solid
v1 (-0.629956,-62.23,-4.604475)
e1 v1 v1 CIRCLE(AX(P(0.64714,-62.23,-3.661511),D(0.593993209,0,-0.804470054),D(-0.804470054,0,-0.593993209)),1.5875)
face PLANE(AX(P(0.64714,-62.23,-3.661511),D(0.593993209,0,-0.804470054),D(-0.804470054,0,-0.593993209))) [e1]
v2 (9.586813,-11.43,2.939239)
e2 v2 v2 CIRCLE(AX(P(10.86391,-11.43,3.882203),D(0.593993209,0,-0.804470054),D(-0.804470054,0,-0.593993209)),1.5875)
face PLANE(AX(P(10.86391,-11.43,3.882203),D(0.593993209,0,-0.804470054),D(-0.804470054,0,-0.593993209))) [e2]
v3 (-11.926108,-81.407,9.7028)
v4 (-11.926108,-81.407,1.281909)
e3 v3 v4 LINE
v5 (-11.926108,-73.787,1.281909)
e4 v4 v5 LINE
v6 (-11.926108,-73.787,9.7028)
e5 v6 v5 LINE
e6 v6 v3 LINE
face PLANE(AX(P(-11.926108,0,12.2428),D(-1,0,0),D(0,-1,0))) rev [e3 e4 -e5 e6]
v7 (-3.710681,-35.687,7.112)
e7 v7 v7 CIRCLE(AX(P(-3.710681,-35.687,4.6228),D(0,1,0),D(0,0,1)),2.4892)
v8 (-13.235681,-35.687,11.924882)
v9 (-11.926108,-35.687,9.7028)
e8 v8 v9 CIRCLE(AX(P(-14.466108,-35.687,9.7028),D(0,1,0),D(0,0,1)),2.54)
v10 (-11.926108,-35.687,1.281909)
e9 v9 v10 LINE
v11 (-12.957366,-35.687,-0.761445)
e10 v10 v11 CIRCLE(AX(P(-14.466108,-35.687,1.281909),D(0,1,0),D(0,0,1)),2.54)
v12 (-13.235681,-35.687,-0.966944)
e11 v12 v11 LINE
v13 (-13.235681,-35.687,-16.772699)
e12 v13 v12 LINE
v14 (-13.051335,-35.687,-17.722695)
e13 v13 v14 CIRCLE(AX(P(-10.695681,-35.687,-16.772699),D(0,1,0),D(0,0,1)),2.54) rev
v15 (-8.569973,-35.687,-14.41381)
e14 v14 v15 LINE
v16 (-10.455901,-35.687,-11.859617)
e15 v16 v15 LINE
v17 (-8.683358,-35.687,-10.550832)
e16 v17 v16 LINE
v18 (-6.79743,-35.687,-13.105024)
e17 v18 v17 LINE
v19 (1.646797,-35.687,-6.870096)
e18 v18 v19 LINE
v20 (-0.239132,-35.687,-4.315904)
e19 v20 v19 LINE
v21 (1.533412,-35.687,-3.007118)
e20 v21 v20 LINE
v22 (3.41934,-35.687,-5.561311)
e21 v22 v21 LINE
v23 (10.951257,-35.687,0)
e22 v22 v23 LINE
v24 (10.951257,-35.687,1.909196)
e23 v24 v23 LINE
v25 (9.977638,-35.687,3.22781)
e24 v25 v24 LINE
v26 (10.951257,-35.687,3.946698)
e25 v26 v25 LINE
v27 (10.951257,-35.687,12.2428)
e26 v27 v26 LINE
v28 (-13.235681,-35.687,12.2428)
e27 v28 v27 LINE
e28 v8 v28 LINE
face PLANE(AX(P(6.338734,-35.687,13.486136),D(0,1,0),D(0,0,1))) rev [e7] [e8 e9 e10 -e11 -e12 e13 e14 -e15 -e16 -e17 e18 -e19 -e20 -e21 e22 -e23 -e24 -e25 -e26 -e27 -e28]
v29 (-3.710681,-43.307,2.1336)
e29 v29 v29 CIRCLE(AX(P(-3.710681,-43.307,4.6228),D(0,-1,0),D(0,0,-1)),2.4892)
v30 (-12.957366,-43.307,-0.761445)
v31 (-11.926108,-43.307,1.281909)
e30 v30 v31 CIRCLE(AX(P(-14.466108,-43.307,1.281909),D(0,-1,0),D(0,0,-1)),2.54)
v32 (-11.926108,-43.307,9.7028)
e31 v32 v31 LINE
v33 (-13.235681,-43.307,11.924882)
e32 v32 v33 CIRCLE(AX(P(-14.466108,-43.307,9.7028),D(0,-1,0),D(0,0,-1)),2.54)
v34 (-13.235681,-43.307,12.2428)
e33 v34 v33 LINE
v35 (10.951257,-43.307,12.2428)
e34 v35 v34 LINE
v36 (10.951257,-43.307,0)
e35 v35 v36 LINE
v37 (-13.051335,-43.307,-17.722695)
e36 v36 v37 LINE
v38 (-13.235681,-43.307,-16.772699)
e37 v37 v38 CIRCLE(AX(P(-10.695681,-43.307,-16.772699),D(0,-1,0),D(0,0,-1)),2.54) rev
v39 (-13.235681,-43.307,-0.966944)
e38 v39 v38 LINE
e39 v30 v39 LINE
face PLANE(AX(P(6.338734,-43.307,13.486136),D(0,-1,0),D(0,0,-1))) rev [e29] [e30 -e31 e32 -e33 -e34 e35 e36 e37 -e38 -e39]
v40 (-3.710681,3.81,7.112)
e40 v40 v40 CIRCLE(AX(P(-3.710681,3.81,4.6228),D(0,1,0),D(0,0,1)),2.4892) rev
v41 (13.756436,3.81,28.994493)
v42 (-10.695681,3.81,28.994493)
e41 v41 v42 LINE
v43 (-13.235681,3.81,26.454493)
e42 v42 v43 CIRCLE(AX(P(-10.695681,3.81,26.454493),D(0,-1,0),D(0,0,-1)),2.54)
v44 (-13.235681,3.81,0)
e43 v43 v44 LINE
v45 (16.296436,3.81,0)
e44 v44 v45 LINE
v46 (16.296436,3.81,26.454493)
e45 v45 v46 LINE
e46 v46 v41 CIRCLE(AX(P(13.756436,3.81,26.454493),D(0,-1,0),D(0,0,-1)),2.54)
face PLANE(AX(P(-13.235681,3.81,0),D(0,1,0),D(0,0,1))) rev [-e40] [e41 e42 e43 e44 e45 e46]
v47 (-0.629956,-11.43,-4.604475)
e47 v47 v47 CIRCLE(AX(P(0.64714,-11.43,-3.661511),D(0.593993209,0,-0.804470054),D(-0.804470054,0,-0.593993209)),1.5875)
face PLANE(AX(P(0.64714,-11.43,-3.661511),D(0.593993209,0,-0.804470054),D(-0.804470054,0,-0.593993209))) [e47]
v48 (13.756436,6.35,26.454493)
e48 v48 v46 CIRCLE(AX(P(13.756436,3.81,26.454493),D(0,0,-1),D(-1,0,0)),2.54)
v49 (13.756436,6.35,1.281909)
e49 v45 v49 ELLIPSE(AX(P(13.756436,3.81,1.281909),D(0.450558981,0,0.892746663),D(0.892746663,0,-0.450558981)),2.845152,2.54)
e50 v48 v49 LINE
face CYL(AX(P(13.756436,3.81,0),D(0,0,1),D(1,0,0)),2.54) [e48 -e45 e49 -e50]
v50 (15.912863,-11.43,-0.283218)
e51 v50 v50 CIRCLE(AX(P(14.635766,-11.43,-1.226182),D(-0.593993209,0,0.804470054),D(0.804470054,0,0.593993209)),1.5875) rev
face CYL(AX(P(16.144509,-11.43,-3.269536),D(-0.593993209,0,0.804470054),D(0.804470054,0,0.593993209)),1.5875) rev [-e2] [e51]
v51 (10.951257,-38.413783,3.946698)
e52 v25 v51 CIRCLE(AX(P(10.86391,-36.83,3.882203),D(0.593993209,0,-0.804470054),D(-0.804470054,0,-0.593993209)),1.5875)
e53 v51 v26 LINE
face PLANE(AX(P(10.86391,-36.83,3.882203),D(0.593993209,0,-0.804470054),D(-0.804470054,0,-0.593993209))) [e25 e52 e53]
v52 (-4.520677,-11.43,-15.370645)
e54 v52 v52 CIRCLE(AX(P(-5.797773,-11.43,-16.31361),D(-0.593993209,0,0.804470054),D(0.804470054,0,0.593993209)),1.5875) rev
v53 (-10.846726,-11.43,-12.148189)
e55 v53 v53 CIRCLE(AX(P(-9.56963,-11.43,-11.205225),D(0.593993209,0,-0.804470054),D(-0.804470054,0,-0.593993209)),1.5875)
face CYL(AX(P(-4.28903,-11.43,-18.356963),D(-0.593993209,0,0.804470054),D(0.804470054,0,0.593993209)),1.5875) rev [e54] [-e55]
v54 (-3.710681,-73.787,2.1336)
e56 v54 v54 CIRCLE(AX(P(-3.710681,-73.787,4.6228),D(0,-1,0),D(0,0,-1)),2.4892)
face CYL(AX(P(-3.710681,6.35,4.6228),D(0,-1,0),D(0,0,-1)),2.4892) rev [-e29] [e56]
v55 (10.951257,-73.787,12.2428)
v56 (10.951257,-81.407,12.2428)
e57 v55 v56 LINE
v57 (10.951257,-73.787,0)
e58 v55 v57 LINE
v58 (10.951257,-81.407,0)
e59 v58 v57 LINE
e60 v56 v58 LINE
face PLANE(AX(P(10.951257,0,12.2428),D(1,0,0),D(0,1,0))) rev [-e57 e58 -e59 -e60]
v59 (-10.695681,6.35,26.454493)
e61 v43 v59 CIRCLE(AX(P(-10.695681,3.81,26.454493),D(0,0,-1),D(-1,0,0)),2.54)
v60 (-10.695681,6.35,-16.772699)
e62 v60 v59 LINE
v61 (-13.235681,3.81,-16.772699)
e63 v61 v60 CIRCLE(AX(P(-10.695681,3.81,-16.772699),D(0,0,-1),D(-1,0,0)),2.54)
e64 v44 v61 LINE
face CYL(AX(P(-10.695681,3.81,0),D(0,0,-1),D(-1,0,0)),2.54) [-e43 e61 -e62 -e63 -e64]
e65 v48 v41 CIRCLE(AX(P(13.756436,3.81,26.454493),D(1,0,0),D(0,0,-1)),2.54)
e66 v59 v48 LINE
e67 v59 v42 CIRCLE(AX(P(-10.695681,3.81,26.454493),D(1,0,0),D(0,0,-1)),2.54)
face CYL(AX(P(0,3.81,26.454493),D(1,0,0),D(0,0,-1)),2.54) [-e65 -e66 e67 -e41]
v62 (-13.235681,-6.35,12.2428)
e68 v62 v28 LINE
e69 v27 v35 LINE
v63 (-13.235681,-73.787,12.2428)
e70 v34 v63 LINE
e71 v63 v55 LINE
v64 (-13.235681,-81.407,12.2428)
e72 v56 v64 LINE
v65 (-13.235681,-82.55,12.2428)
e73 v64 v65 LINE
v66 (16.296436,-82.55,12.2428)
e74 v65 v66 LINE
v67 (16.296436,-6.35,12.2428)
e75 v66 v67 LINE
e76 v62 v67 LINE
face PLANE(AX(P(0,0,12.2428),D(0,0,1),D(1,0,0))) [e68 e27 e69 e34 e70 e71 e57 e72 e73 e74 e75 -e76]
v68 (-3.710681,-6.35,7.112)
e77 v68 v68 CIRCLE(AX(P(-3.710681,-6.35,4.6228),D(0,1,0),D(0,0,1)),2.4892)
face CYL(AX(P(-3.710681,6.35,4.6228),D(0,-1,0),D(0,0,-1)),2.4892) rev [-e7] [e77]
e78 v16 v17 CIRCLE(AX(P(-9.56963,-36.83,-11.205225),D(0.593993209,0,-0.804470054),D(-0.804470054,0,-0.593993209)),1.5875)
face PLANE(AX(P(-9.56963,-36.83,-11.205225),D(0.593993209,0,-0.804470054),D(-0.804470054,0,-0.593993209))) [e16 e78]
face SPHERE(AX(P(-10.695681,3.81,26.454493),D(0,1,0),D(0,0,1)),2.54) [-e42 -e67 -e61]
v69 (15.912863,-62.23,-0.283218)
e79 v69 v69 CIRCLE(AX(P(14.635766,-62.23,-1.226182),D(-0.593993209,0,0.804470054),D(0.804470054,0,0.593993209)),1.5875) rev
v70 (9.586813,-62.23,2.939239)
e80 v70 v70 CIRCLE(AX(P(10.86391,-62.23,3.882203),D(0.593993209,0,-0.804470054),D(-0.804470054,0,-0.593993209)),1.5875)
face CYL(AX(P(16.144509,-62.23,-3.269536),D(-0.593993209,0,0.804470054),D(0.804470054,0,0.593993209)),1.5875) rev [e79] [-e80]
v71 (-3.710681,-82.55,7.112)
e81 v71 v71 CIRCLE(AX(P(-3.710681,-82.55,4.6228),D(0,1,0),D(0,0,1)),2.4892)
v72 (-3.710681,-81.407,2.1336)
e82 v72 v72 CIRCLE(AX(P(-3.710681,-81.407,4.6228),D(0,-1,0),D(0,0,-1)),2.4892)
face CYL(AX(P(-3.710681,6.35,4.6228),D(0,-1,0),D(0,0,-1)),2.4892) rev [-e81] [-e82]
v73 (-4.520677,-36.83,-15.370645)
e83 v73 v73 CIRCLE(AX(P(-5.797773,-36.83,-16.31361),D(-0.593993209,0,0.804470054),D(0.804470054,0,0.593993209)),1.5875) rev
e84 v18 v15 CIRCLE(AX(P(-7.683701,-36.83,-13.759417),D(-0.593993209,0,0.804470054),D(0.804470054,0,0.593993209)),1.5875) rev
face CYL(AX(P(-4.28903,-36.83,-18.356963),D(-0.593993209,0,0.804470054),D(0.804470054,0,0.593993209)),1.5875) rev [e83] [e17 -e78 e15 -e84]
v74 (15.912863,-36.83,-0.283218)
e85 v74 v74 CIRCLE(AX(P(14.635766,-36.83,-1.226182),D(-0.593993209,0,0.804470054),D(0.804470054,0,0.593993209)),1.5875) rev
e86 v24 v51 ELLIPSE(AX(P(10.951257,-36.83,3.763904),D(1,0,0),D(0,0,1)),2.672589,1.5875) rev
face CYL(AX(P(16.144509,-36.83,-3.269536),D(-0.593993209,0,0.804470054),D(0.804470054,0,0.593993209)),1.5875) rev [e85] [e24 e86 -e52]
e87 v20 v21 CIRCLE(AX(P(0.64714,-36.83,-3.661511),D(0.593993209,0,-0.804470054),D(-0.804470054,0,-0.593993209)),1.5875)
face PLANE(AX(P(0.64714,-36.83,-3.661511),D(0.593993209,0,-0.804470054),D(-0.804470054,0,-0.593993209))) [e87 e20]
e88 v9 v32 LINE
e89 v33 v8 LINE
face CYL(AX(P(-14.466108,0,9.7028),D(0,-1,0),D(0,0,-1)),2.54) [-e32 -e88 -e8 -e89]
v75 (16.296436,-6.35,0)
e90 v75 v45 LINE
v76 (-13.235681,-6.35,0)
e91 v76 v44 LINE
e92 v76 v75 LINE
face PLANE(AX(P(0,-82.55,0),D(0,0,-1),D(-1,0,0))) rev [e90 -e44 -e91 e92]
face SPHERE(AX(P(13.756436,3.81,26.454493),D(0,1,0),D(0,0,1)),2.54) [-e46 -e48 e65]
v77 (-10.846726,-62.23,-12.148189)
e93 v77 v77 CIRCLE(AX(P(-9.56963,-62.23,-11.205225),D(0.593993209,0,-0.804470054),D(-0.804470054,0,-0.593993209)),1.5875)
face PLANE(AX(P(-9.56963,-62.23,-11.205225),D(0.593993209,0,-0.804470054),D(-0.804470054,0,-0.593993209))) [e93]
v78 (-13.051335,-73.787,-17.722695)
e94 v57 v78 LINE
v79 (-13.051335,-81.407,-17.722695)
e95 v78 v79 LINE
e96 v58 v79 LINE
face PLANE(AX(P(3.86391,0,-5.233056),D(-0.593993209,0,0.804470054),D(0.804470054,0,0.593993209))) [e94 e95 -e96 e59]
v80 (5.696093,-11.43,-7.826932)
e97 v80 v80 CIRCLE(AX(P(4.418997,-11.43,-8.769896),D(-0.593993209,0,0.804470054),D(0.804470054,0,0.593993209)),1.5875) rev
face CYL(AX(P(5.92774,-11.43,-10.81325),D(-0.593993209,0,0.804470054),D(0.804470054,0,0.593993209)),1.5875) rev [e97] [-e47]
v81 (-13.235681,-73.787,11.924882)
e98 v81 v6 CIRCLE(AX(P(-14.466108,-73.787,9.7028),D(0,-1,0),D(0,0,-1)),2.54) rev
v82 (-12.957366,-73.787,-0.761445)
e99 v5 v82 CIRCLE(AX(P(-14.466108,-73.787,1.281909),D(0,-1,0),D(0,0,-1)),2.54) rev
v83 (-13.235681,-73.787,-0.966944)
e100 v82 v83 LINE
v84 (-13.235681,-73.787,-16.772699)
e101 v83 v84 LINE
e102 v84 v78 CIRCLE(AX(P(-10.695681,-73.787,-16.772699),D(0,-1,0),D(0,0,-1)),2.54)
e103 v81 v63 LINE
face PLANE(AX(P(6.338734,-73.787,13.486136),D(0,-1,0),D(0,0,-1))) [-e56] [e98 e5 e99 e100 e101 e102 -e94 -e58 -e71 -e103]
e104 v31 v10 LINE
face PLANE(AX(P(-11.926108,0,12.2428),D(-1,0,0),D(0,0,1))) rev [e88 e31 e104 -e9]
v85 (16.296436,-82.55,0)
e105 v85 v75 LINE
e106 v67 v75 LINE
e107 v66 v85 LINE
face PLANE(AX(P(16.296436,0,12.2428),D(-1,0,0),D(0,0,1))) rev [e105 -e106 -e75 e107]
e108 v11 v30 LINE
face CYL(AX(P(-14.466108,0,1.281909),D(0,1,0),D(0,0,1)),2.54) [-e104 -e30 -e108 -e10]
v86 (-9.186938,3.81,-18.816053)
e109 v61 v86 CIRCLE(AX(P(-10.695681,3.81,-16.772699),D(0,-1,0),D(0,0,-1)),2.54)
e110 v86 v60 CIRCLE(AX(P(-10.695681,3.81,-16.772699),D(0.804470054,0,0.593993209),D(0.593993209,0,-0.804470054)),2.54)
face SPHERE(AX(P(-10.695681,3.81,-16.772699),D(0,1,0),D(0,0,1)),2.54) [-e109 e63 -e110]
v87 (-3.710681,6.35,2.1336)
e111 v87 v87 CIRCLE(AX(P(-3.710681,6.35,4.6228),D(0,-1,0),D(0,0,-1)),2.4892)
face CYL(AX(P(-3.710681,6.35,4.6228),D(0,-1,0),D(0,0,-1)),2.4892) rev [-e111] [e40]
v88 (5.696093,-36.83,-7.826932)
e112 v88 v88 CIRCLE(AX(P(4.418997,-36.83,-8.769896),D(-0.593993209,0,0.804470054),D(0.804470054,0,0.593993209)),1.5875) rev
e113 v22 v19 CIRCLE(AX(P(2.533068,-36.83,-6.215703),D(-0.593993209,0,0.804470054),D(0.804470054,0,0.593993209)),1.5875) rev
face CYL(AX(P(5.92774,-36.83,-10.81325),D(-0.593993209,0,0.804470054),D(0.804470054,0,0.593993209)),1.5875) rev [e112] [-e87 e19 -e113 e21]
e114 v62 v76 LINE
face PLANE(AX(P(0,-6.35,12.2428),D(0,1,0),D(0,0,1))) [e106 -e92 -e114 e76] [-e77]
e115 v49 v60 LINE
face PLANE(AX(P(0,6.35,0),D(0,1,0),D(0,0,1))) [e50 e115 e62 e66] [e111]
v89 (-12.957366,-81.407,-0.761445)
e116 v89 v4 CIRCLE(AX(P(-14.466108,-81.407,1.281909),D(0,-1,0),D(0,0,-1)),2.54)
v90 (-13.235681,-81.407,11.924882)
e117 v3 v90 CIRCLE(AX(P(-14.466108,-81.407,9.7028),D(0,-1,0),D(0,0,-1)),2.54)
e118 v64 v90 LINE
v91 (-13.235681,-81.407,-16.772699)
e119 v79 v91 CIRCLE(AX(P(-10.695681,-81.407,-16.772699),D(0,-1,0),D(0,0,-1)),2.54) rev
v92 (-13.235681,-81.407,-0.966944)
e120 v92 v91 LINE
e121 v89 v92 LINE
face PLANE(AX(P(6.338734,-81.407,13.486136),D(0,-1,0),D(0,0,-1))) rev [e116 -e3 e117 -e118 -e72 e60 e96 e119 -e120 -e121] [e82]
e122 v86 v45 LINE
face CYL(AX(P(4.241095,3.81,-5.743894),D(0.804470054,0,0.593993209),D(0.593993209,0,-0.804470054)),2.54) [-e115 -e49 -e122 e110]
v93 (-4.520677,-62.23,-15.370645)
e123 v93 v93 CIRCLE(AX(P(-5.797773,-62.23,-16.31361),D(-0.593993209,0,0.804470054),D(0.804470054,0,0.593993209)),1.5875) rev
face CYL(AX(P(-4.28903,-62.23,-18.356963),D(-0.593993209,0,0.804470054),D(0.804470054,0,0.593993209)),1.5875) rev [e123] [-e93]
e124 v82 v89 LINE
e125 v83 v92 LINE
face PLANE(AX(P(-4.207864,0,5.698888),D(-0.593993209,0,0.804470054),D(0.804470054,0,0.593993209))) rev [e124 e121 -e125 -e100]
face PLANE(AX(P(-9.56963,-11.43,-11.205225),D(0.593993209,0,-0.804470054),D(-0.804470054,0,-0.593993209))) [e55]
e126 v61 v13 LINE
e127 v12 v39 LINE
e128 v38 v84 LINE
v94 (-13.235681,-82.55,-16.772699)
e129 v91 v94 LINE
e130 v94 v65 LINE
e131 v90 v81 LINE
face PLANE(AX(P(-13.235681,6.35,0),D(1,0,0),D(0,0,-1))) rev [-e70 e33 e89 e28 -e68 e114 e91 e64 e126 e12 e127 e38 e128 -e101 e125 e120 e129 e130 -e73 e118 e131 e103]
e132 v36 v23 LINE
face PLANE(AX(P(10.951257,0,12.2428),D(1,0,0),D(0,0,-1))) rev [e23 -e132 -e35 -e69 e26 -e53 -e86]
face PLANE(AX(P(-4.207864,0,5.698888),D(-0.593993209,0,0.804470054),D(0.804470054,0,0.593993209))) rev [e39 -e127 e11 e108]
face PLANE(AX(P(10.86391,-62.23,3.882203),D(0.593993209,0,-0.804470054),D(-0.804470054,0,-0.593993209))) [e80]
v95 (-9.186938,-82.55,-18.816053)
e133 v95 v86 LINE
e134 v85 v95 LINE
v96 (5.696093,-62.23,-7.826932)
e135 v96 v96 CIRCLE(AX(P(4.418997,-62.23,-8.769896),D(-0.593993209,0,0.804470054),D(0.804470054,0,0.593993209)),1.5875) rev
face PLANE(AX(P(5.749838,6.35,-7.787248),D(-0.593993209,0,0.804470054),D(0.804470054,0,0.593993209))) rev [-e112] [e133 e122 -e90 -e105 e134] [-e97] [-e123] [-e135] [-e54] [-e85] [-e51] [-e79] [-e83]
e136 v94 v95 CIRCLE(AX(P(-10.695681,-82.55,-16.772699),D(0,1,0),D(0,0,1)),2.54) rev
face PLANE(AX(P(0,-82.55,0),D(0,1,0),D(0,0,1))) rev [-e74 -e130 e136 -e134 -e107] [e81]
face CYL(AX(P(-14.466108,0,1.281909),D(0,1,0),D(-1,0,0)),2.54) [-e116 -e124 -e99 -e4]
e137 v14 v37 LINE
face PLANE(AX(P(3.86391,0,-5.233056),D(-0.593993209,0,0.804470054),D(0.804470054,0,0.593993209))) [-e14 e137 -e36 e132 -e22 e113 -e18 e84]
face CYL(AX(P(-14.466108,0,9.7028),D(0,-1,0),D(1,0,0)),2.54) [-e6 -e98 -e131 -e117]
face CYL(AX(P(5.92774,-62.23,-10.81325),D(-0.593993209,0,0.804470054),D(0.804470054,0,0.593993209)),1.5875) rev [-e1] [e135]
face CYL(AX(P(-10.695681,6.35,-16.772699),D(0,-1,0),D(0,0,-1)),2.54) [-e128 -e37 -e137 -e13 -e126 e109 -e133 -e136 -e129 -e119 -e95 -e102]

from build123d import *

# Parameters (mm, degrees)
SKETCH1_W               = 29.532117275
SKETCH1_H               = 16.294493356
BOSS_EXTRUDE1_DEPTH     = 6.35
BOSS_EXTRUDE2_DEPTH     = 82.55
SKETCH2_W               = 29.532117275
SKETCH2_H               = 16.294493356
CUT_EXTRUDE1_DEPTH      = 3.175
SKETCH4_W               = 29.532117275
SKETCH4_H               = 12.7
BOSS_EXTRUDE3_DEPTH     = 3.175
SKETCH7_W               = 36.710026843
SKETCH7_H               = 7.62
CUT_EXTRUDE4_DEPTH      = 13.589
SKETCH8_W               = 36.710026843
SKETCH8_H               = 7.62
CUT_EXTRUDE5_DEPTH      = 13.589
SKETCH9_W               = 29.532117275
SKETCH9_H               = 76.2
SKETCH9_W_2             = 22.877365929
SKETCH9_H_2             = 7.62
BOSS_EXTRUDE5_DEPTH     = 12.2428
CUT_EXTRUDE6_DEPTH      = 95.918198917
CUT_EXTRUDE6_DEPTH_BACK = 95.918198917
SKETCH10_R              = 2.4892
FILLET2_R               = 2.54
FILLET3_R               = 2.54
CUT_EXTRUDE7_DEPTH      = 2.54
CUT_EXTRUDE7_DEPTH_BACK = 6.35
SKETCH11_R              = 1.5875
CUT_EXTRUDE8_DEPTH      = 93.343538462
CUT_EXTRUDE8_DEPTH_BACK = 93.343538462
SKETCH12_W              = 28.994493356
SKETCH12_H              = 0.635


with BuildPart() as part:
    # Sketch1 → Boss-Extrude1 (new body)
    with BuildSketch(Plane(origin=(0, 0, 0), x_dir=(1, 0, 0), z_dir=(0, 1, 0))):
        Polygon((16.296436439, 0), (-13.235680836, 21.805506644), (-13.235680836, 0), align=None)
        with Locations((1.530377802, -8.147246678)):
            Rectangle(SKETCH1_W, SKETCH1_H)
    extrude(amount=BOSS_EXTRUDE1_DEPTH)

    # Sketch1<3> → Boss-Extrude2 (add)
    with BuildSketch(Plane(origin=(0, 0, 0), x_dir=(1, 0, 0), z_dir=(0, 1, 0))):
        Polygon((16.296436439, 0), (-13.235680836, 21.805506644), (-13.235680836, 0), align=None)
    extrude(amount=-BOSS_EXTRUDE2_DEPTH)

    # Sketch2 → Cut-Extrude1 (cut)
    with BuildSketch(Plane(origin=(0, 0, 0), x_dir=(-1, 0, 0), z_dir=(0, -1, 0))):
        with Locations((-1.530377802, -8.147246678)):
            Rectangle(SKETCH2_W, SKETCH2_H)
    extrude(amount=-CUT_EXTRUDE1_DEPTH, mode=Mode.SUBTRACT)

    # Sketch4 → Boss-Extrude3 (add)
    with BuildSketch(Plane(origin=(0, 6.35, 0), x_dir=(1, 0, 0), z_dir=(0, 1, 0))):
        with Locations((1.530377802, -22.644493356)):
            Rectangle(SKETCH4_W, SKETCH4_H)
    extrude(amount=-BOSS_EXTRUDE3_DEPTH)

    # Sketch7 → Cut-Extrude4 (cut)
    with BuildSketch(Plane(origin=(3.863909533, 0, -5.233055638), x_dir=(-0.804470053980136, 0, -0.5939932089251503), z_dir=(0.5939932089251503, 0, -0.804470053980136))):
        with Locations((5.24501832, -77.597)):
            Rectangle(SKETCH7_W, SKETCH7_H)
    extrude(amount=-CUT_EXTRUDE4_DEPTH, mode=Mode.SUBTRACT)

    # Sketch8 → Cut-Extrude5 (cut)
    with BuildSketch(Plane(origin=(3.863909533, 0, -5.233055638), x_dir=(-0.804470053980136, 0, -0.5939932089251503), z_dir=(0.5939932089251503, 0, -0.804470053980136))):
        with Locations((5.24501832, -39.497)):
            Rectangle(SKETCH8_W, SKETCH8_H)
    extrude(amount=-CUT_EXTRUDE5_DEPTH, mode=Mode.SUBTRACT)

    # Sketch9 → Boss-Extrude5 (add)
    with BuildSketch(Plane.XY):
        with Locations((1.530377802, -44.45)):
            Rectangle(SKETCH9_W, SKETCH9_H)
        with Locations((-0.487425481, -77.597)):
            Rectangle(SKETCH9_W_2, SKETCH9_H_2, mode=Mode.SUBTRACT)
        with Locations((-0.487425481, -39.497)):
            Rectangle(SKETCH9_W_2, SKETCH9_H_2, mode=Mode.SUBTRACT)
    extrude(amount=BOSS_EXTRUDE5_DEPTH)

    # Sketch10 → Cut-Extrude6 (cut, two sides: drawn at the far end of the back side and taken through both)
    with BuildSketch(Plane(origin=(0, -82.55, 0), x_dir=(-1, 0, 0), z_dir=(0, -1, 0)).offset(-CUT_EXTRUDE6_DEPTH_BACK)):
        with Locations(Location((3.710680836, -4.6228, 0), (0, 0, 270))):
            Circle(SKETCH10_R)
    extrude(amount=CUT_EXTRUDE6_DEPTH + CUT_EXTRUDE6_DEPTH_BACK, mode=Mode.SUBTRACT)

    # Fillet2
    # the kernel refuses this fillet: 2.54 mm, written as the material it takes off along each edge
    with BuildSketch(Plane(origin=(-13.235680836, -95.13201822, -21.805506644), x_dir=(0.8044700539801357, 0, 0.5939932089251506), z_dir=(0, 1, 0))) as fillet2_piece_1:
        with BuildLine():
            CenterArc((FILLET2_R * 1.98142019214, -FILLET2_R), FILLET2_R, 90, 126.440893479)
            Line((FILLET2_R * 1.17695013816, -FILLET2_R * 1.59399320893), (0, 0))
            Line((0, 0), (FILLET2_R * 1.98142019214, 0))
        make_face()
    extrude(amount=114.06403644, mode=Mode.SUBTRACT)
    with BuildSketch(Plane(origin=(-11.926108446, -81.407, 0), x_dir=(-0.8044700539801358, 0, -0.5939932089251506), z_dir=(0, 1, 0))) as fillet2_piece_2:
        with BuildLine():
            CenterArc((FILLET2_R * 0.504688507753, FILLET2_R), FILLET2_R, 216.440893479, 53.559106521)
            Line((-FILLET2_R * 0.299781546228, FILLET2_R * 0.406006791075), (0, 0))
            Line((0, 0), (FILLET2_R * 0.504688507753, 0))
        make_face()
    extrude(amount=7.62, mode=Mode.SUBTRACT)
    with BuildSketch(Plane(origin=(-11.926108446, -81.407, 12.2428), x_dir=(-1, 0, 0), z_dir=(0, 1, 0)), Plane(origin=(-11.926108446, -43.307, 12.2428), x_dir=(-1, 0, 0), z_dir=(0, 1, 0))) as fillet2_piece_3:
        with BuildLine():
            CenterArc((FILLET2_R, -FILLET2_R), FILLET2_R, 90, 90)
            Line((0, -FILLET2_R), (0, 0))
            Line((0, 0), (FILLET2_R, 0))
        make_face()
    extrude(amount=7.62, mode=Mode.SUBTRACT)
    with BuildSketch(Plane(origin=(-11.926108446, -35.687, 0), x_dir=(-0.8044700539801356, 0, -0.5939932089251507), z_dir=(0, -1, 0))) as fillet2_piece_4:
        with BuildLine():
            CenterArc((FILLET2_R * 0.504688507753, -FILLET2_R), FILLET2_R, 90, 53.559106521)
            Line((-FILLET2_R * 0.299781546228, -FILLET2_R * 0.406006791075), (0, 0))
            Line((0, 0), (FILLET2_R * 0.504688507753, 0))
        make_face()
    extrude(amount=7.62, mode=Mode.SUBTRACT)
    with BuildSketch(Plane(origin=(-13.235680836, 12.7, 28.994493356), x_dir=(0, 0, -1), z_dir=(0, -1, 0))) as fillet2_piece_5:
        with BuildLine():
            CenterArc((FILLET2_R, FILLET2_R), FILLET2_R, 180, 90)
            Line((0, FILLET2_R), (0, 0))
            Line((0, 0), (FILLET2_R, 0))
        make_face()
    extrude(amount=15.875, mode=Mode.SUBTRACT)
    with BuildSketch(Plane(origin=(16.296436439, 12.7, 28.994493356), x_dir=(0, 0, -1), z_dir=(0, -1, 0))) as fillet2_piece_6:
        with BuildLine():
            CenterArc((FILLET2_R, -FILLET2_R), FILLET2_R, 90, 90)
            Line((0, -FILLET2_R), (0, 0))
            Line((0, 0), (FILLET2_R, 0))
        make_face()
    extrude(amount=15.875, mode=Mode.SUBTRACT)

    # Fillet3
    fillet3_edges = [part.edges().sort_by_distance(p)[0] for p in [
        (-13.235680836, 6.35, 4.840897),
        (1.530377801, 6.35, 28.994493356),
        (16.296436439, 6.35, 13.227246678),
        (15.552487663, 6.35, 28.25054458),
        (-12.491732061, 6.35, 28.25054458),
        (-11.840100649, 6.35, -19.04027588),
        (3.554749177, 6.35, -9.408026646),
    ]]
    fillet(fillet3_edges, radius=FILLET3_R)

    # Sketch11 → Cut-Extrude7 (cut, two sides: drawn at the far end of the back side and taken through both)
    with BuildSketch(Plane(origin=(5.749837972, 0, -7.787248059), x_dir=(-0.8044700539801359, 0, -0.5939932089251502), z_dir=(0.5939932089251502, 0, -0.8044700539801359)).offset(-CUT_EXTRUDE7_DEPTH_BACK)):
        with Locations(Location((-11.04569204, -62.23, 0), (0, 0, 180))):
            Circle(SKETCH11_R)
        with Locations(Location((1.65430796, -62.23, 0), (0, 0, 180))):
            Circle(SKETCH11_R)
        with Locations(Location((14.35430796, -62.23, 0), (0, 0, 180))):
            Circle(SKETCH11_R)
        with Locations(Location((-11.04569204, -36.83, 0), (0, 0, 180))):
            Circle(SKETCH11_R)
        with Locations(Location((1.65430796, -36.83, 0), (0, 0, 180))):
            Circle(SKETCH11_R)
        with Locations(Location((14.35430796, -36.83, 0), (0, 0, 180))):
            Circle(SKETCH11_R)
        with Locations(Location((-11.04569204, -11.43, 0), (0, 0, 180))):
            Circle(SKETCH11_R)
        with Locations(Location((1.65430796, -11.43, 0), (0, 0, 180))):
            Circle(SKETCH11_R)
        with Locations(Location((14.35430796, -11.43, 0), (0, 0, 180))):
            Circle(SKETCH11_R)
    extrude(amount=CUT_EXTRUDE7_DEPTH + CUT_EXTRUDE7_DEPTH_BACK, mode=Mode.SUBTRACT)

    # Sketch12 → Cut-Extrude8 (cut, two sides: drawn at the far end of the back side and taken through both)
    with BuildSketch(Plane(origin=(16.296436439, 0, 0), x_dir=(0, 0, -1), z_dir=(1, 0, 0)).offset(-CUT_EXTRUDE8_DEPTH_BACK)):
        with Locations((-14.497246678, 3.4925)):
            Rectangle(SKETCH12_W, SKETCH12_H)
    extrude(amount=CUT_EXTRUDE8_DEPTH + CUT_EXTRUDE8_DEPTH_BACK, mode=Mode.SUBTRACT)


solid = part.part
